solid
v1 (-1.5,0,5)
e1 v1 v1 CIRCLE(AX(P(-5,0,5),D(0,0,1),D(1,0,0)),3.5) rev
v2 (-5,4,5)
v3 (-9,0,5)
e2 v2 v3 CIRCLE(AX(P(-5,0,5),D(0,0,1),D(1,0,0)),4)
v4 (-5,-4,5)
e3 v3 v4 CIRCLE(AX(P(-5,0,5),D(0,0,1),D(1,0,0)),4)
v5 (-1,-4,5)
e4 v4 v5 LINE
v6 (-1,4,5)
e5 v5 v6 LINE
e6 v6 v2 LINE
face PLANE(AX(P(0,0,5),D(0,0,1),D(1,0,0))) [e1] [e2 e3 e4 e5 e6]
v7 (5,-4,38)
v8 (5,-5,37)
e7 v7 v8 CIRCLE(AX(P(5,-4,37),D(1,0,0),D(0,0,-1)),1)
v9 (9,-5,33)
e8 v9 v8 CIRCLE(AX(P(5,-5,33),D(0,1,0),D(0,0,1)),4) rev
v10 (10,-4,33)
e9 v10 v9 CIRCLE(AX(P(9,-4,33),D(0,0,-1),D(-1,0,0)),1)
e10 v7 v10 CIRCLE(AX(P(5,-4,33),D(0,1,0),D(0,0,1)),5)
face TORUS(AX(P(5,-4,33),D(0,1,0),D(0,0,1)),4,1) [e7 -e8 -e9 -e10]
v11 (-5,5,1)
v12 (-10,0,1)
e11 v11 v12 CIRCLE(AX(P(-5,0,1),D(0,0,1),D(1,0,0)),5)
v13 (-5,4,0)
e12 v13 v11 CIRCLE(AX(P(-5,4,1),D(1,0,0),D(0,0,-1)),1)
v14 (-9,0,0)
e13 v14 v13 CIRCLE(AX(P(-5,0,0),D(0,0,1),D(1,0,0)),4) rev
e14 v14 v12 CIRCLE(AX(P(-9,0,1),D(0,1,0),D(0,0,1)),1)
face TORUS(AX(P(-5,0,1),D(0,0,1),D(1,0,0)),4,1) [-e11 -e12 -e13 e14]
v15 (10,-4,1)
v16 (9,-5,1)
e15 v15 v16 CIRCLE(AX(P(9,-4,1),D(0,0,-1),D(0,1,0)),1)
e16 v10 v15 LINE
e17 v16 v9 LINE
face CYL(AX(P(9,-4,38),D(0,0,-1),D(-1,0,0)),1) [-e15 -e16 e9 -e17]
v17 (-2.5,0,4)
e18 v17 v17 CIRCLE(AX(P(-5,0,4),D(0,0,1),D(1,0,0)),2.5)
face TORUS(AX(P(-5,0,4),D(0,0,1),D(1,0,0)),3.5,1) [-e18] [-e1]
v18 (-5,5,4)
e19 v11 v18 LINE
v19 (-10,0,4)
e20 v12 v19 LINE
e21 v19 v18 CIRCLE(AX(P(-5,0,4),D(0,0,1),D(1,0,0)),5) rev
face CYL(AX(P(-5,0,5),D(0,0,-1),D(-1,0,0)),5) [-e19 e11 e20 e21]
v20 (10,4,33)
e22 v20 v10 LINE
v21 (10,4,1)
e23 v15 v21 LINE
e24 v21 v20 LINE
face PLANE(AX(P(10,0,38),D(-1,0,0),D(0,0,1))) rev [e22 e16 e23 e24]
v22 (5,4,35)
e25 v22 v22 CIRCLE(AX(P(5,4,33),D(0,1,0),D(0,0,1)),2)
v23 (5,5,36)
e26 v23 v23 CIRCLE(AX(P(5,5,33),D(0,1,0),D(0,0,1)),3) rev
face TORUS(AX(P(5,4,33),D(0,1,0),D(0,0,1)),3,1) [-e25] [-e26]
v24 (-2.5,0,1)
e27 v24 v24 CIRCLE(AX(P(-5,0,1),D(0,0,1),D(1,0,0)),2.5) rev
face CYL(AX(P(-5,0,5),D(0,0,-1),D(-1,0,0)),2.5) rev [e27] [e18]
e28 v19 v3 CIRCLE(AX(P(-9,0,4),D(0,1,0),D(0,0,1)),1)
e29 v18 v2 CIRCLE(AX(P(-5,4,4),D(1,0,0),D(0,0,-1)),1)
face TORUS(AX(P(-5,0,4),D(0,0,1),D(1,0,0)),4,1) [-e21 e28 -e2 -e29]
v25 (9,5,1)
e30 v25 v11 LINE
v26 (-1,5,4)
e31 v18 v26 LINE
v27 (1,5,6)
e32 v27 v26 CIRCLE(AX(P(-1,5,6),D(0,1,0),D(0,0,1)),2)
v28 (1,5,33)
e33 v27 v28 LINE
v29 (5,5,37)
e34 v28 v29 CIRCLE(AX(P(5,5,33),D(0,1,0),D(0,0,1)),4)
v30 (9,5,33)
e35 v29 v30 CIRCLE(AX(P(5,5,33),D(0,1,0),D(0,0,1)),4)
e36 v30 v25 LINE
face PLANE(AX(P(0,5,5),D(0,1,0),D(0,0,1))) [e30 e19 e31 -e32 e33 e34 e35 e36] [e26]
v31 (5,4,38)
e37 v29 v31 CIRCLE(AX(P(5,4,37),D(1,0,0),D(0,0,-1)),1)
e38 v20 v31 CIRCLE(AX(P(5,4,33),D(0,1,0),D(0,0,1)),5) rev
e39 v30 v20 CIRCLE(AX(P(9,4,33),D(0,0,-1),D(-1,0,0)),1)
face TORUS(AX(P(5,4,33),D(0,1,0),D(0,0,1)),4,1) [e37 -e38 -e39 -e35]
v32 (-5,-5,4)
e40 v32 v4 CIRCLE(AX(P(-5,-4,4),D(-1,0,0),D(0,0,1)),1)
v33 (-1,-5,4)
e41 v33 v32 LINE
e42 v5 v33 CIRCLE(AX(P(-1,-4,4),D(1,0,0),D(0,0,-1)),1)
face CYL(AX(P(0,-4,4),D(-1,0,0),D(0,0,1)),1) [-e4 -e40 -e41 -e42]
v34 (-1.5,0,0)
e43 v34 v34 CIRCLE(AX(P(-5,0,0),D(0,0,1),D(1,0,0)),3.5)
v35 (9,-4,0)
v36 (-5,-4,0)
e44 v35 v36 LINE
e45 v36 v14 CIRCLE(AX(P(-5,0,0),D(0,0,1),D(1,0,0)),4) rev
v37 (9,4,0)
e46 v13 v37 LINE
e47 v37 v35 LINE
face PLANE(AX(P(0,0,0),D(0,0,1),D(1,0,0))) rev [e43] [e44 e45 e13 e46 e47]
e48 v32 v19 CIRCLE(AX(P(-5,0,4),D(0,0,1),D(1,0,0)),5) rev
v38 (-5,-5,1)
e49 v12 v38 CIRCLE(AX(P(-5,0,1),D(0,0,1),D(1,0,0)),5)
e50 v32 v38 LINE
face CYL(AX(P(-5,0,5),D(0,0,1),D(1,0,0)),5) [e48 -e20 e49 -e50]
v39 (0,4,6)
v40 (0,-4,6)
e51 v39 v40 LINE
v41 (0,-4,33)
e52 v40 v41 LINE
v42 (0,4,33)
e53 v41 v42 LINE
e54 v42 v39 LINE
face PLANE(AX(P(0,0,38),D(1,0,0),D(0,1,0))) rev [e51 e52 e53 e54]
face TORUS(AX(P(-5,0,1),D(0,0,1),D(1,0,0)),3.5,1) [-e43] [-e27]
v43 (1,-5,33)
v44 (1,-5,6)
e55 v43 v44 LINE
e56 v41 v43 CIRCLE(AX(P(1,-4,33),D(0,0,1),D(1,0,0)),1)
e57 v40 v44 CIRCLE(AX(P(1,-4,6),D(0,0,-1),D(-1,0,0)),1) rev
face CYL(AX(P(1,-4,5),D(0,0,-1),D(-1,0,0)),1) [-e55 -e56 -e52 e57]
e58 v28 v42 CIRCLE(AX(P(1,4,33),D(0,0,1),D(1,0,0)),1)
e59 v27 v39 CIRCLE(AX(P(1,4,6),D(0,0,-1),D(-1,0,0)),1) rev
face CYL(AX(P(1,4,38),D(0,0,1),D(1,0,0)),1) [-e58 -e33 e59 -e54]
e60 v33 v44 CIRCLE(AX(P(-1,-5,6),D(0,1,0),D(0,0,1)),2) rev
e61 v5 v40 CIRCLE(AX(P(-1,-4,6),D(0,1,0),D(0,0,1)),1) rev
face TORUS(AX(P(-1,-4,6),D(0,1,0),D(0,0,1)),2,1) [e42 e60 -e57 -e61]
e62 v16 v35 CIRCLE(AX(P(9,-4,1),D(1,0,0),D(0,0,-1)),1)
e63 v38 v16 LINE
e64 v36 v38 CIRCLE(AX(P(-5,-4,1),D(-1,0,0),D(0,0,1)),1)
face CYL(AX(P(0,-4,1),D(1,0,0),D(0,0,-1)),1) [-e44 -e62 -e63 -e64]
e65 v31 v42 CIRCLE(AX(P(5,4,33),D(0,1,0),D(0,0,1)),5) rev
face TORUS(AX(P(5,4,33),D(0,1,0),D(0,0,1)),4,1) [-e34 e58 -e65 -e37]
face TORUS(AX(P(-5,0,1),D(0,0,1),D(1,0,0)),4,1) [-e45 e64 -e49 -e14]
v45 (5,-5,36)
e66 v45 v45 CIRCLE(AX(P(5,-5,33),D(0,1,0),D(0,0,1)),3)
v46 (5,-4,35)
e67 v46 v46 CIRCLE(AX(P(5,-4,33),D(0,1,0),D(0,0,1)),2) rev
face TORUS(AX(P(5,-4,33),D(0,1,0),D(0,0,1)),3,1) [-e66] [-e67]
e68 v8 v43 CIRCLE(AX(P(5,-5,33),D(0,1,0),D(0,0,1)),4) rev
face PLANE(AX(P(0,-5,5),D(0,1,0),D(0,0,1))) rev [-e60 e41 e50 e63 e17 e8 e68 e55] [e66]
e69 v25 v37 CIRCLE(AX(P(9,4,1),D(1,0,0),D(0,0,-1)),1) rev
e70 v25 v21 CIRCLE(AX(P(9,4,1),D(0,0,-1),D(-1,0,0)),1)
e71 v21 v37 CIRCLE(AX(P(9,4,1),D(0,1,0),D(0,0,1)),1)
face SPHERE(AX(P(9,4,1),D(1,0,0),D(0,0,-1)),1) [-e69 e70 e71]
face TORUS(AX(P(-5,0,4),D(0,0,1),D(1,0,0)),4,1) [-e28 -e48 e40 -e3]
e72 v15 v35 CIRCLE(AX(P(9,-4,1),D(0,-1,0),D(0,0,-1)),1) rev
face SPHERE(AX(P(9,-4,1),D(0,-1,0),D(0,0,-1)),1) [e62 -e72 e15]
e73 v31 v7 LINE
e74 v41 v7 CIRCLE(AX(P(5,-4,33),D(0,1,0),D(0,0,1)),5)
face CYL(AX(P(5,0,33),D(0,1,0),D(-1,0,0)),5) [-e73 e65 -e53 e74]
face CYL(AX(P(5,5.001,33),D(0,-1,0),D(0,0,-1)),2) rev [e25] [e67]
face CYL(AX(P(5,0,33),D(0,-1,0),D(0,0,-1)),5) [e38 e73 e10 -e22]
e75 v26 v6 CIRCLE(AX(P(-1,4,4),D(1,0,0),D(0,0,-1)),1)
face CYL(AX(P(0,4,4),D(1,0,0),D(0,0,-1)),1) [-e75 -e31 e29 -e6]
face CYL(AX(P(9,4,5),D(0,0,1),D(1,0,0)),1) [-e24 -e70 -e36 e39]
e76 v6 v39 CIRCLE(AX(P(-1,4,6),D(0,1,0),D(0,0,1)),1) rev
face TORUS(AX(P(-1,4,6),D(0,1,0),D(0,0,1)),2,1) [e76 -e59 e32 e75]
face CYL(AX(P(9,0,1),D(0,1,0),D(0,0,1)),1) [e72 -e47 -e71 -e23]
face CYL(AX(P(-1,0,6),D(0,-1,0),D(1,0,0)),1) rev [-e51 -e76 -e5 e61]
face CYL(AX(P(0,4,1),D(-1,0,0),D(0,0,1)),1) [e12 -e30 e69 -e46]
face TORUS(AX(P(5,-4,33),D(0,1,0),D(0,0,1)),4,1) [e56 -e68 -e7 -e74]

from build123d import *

# Parameters (mm, degrees)
SKETCH1_W           = 10
SKETCH1_H           = 10
SKETCH1_R           = 2.5
BOSS_EXTRUDE1_DEPTH = 5
SKETCH1_4_W         = 10
SKETCH1_4_H         = 10
BOSS_EXTRUDE2_DEPTH = 38
CUT_EXTRUDE1_REACH  = 42.546
SKETCH2_R           = 2
FILLET1_R           = 5
FILLET2_R           = 1


with BuildPart() as part:
    # Sketch1 → Boss-Extrude1 (new body)
    with BuildSketch(Plane.XY):
        with Locations((-5, 0)):
            Rectangle(SKETCH1_W, SKETCH1_H)
        with Locations((-5, 0)):
            Circle(SKETCH1_R, mode=Mode.SUBTRACT)
    extrude(amount=BOSS_EXTRUDE1_DEPTH)

    # Sketch1<4> → Boss-Extrude2 (add)
    with BuildSketch(Plane.XY):
        with Locations((5, 0)):
            Rectangle(SKETCH1_4_W, SKETCH1_4_H)
    extrude(amount=BOSS_EXTRUDE2_DEPTH)

    # Sketch2 → Cut-Extrude1 (cut, up to next)
    with BuildSketch(Plane.XZ.offset(5), mode=Mode.PRIVATE) as cut_extrude1_sk1:
        with Locations(Location((5, 33, 0), (0, 0, 270))):
            Circle(SKETCH2_R)
    cut_extrude1_tool1 = extrude(cut_extrude1_sk1.sketch, amount=-CUT_EXTRUDE1_REACH, mode=Mode.PRIVATE) & part.part
    add(cut_extrude1_tool1.solids().sort_by_distance((5, -5, 33))[0], mode=Mode.SUBTRACT)

    # Fillet1
    fillet1_edges = [part.edges().sort_by_distance(p)[0] for p in [
        (-10, 5, 2.5),
        (-10, -5, 2.5),
        (10, 0, 38),
        (0, 0, 38),
    ]]
    fillet(fillet1_edges, radius=FILLET1_R - 0.0001)  # a hair under: the kernel refuses the full size

    # Fillet2
    fillet2_edges = [part.edges().sort_by_distance(p)[0] for p in [
        (10, 0, 0),
        (0, 0, 5),
        (5, 5, 35),
        (5, -5, 35),
        (2.49995, 5, 0),
        (2.49995, -5, 0),
        (-8.535563195, -3.535563195, 0),
        (-8.535563195, 3.535563195, 0),
        (-2.50005, 5, 5),
        (0, 5, 19.00005),
        (10, 5, 16.50005),
        (1.464436805, 5, 36.535563195),
        (8.535563195, 5, 36.535563195),
        (-2.50005, -5, 5),
        (-8.535563195, -3.535563195, 5),
        (-8.535563195, 3.535563195, 5),
        (10, -5, 16.50005),
        (0, -5, 19.00005),
        (1.464436805, -5, 36.535563195),
        (8.535563195, -5, 36.535563195),
        (-7.5, 0, 5),
        (-7.5, 0, 0),
    ]]
    fillet(fillet2_edges, radius=FILLET2_R)


solid = part.part
